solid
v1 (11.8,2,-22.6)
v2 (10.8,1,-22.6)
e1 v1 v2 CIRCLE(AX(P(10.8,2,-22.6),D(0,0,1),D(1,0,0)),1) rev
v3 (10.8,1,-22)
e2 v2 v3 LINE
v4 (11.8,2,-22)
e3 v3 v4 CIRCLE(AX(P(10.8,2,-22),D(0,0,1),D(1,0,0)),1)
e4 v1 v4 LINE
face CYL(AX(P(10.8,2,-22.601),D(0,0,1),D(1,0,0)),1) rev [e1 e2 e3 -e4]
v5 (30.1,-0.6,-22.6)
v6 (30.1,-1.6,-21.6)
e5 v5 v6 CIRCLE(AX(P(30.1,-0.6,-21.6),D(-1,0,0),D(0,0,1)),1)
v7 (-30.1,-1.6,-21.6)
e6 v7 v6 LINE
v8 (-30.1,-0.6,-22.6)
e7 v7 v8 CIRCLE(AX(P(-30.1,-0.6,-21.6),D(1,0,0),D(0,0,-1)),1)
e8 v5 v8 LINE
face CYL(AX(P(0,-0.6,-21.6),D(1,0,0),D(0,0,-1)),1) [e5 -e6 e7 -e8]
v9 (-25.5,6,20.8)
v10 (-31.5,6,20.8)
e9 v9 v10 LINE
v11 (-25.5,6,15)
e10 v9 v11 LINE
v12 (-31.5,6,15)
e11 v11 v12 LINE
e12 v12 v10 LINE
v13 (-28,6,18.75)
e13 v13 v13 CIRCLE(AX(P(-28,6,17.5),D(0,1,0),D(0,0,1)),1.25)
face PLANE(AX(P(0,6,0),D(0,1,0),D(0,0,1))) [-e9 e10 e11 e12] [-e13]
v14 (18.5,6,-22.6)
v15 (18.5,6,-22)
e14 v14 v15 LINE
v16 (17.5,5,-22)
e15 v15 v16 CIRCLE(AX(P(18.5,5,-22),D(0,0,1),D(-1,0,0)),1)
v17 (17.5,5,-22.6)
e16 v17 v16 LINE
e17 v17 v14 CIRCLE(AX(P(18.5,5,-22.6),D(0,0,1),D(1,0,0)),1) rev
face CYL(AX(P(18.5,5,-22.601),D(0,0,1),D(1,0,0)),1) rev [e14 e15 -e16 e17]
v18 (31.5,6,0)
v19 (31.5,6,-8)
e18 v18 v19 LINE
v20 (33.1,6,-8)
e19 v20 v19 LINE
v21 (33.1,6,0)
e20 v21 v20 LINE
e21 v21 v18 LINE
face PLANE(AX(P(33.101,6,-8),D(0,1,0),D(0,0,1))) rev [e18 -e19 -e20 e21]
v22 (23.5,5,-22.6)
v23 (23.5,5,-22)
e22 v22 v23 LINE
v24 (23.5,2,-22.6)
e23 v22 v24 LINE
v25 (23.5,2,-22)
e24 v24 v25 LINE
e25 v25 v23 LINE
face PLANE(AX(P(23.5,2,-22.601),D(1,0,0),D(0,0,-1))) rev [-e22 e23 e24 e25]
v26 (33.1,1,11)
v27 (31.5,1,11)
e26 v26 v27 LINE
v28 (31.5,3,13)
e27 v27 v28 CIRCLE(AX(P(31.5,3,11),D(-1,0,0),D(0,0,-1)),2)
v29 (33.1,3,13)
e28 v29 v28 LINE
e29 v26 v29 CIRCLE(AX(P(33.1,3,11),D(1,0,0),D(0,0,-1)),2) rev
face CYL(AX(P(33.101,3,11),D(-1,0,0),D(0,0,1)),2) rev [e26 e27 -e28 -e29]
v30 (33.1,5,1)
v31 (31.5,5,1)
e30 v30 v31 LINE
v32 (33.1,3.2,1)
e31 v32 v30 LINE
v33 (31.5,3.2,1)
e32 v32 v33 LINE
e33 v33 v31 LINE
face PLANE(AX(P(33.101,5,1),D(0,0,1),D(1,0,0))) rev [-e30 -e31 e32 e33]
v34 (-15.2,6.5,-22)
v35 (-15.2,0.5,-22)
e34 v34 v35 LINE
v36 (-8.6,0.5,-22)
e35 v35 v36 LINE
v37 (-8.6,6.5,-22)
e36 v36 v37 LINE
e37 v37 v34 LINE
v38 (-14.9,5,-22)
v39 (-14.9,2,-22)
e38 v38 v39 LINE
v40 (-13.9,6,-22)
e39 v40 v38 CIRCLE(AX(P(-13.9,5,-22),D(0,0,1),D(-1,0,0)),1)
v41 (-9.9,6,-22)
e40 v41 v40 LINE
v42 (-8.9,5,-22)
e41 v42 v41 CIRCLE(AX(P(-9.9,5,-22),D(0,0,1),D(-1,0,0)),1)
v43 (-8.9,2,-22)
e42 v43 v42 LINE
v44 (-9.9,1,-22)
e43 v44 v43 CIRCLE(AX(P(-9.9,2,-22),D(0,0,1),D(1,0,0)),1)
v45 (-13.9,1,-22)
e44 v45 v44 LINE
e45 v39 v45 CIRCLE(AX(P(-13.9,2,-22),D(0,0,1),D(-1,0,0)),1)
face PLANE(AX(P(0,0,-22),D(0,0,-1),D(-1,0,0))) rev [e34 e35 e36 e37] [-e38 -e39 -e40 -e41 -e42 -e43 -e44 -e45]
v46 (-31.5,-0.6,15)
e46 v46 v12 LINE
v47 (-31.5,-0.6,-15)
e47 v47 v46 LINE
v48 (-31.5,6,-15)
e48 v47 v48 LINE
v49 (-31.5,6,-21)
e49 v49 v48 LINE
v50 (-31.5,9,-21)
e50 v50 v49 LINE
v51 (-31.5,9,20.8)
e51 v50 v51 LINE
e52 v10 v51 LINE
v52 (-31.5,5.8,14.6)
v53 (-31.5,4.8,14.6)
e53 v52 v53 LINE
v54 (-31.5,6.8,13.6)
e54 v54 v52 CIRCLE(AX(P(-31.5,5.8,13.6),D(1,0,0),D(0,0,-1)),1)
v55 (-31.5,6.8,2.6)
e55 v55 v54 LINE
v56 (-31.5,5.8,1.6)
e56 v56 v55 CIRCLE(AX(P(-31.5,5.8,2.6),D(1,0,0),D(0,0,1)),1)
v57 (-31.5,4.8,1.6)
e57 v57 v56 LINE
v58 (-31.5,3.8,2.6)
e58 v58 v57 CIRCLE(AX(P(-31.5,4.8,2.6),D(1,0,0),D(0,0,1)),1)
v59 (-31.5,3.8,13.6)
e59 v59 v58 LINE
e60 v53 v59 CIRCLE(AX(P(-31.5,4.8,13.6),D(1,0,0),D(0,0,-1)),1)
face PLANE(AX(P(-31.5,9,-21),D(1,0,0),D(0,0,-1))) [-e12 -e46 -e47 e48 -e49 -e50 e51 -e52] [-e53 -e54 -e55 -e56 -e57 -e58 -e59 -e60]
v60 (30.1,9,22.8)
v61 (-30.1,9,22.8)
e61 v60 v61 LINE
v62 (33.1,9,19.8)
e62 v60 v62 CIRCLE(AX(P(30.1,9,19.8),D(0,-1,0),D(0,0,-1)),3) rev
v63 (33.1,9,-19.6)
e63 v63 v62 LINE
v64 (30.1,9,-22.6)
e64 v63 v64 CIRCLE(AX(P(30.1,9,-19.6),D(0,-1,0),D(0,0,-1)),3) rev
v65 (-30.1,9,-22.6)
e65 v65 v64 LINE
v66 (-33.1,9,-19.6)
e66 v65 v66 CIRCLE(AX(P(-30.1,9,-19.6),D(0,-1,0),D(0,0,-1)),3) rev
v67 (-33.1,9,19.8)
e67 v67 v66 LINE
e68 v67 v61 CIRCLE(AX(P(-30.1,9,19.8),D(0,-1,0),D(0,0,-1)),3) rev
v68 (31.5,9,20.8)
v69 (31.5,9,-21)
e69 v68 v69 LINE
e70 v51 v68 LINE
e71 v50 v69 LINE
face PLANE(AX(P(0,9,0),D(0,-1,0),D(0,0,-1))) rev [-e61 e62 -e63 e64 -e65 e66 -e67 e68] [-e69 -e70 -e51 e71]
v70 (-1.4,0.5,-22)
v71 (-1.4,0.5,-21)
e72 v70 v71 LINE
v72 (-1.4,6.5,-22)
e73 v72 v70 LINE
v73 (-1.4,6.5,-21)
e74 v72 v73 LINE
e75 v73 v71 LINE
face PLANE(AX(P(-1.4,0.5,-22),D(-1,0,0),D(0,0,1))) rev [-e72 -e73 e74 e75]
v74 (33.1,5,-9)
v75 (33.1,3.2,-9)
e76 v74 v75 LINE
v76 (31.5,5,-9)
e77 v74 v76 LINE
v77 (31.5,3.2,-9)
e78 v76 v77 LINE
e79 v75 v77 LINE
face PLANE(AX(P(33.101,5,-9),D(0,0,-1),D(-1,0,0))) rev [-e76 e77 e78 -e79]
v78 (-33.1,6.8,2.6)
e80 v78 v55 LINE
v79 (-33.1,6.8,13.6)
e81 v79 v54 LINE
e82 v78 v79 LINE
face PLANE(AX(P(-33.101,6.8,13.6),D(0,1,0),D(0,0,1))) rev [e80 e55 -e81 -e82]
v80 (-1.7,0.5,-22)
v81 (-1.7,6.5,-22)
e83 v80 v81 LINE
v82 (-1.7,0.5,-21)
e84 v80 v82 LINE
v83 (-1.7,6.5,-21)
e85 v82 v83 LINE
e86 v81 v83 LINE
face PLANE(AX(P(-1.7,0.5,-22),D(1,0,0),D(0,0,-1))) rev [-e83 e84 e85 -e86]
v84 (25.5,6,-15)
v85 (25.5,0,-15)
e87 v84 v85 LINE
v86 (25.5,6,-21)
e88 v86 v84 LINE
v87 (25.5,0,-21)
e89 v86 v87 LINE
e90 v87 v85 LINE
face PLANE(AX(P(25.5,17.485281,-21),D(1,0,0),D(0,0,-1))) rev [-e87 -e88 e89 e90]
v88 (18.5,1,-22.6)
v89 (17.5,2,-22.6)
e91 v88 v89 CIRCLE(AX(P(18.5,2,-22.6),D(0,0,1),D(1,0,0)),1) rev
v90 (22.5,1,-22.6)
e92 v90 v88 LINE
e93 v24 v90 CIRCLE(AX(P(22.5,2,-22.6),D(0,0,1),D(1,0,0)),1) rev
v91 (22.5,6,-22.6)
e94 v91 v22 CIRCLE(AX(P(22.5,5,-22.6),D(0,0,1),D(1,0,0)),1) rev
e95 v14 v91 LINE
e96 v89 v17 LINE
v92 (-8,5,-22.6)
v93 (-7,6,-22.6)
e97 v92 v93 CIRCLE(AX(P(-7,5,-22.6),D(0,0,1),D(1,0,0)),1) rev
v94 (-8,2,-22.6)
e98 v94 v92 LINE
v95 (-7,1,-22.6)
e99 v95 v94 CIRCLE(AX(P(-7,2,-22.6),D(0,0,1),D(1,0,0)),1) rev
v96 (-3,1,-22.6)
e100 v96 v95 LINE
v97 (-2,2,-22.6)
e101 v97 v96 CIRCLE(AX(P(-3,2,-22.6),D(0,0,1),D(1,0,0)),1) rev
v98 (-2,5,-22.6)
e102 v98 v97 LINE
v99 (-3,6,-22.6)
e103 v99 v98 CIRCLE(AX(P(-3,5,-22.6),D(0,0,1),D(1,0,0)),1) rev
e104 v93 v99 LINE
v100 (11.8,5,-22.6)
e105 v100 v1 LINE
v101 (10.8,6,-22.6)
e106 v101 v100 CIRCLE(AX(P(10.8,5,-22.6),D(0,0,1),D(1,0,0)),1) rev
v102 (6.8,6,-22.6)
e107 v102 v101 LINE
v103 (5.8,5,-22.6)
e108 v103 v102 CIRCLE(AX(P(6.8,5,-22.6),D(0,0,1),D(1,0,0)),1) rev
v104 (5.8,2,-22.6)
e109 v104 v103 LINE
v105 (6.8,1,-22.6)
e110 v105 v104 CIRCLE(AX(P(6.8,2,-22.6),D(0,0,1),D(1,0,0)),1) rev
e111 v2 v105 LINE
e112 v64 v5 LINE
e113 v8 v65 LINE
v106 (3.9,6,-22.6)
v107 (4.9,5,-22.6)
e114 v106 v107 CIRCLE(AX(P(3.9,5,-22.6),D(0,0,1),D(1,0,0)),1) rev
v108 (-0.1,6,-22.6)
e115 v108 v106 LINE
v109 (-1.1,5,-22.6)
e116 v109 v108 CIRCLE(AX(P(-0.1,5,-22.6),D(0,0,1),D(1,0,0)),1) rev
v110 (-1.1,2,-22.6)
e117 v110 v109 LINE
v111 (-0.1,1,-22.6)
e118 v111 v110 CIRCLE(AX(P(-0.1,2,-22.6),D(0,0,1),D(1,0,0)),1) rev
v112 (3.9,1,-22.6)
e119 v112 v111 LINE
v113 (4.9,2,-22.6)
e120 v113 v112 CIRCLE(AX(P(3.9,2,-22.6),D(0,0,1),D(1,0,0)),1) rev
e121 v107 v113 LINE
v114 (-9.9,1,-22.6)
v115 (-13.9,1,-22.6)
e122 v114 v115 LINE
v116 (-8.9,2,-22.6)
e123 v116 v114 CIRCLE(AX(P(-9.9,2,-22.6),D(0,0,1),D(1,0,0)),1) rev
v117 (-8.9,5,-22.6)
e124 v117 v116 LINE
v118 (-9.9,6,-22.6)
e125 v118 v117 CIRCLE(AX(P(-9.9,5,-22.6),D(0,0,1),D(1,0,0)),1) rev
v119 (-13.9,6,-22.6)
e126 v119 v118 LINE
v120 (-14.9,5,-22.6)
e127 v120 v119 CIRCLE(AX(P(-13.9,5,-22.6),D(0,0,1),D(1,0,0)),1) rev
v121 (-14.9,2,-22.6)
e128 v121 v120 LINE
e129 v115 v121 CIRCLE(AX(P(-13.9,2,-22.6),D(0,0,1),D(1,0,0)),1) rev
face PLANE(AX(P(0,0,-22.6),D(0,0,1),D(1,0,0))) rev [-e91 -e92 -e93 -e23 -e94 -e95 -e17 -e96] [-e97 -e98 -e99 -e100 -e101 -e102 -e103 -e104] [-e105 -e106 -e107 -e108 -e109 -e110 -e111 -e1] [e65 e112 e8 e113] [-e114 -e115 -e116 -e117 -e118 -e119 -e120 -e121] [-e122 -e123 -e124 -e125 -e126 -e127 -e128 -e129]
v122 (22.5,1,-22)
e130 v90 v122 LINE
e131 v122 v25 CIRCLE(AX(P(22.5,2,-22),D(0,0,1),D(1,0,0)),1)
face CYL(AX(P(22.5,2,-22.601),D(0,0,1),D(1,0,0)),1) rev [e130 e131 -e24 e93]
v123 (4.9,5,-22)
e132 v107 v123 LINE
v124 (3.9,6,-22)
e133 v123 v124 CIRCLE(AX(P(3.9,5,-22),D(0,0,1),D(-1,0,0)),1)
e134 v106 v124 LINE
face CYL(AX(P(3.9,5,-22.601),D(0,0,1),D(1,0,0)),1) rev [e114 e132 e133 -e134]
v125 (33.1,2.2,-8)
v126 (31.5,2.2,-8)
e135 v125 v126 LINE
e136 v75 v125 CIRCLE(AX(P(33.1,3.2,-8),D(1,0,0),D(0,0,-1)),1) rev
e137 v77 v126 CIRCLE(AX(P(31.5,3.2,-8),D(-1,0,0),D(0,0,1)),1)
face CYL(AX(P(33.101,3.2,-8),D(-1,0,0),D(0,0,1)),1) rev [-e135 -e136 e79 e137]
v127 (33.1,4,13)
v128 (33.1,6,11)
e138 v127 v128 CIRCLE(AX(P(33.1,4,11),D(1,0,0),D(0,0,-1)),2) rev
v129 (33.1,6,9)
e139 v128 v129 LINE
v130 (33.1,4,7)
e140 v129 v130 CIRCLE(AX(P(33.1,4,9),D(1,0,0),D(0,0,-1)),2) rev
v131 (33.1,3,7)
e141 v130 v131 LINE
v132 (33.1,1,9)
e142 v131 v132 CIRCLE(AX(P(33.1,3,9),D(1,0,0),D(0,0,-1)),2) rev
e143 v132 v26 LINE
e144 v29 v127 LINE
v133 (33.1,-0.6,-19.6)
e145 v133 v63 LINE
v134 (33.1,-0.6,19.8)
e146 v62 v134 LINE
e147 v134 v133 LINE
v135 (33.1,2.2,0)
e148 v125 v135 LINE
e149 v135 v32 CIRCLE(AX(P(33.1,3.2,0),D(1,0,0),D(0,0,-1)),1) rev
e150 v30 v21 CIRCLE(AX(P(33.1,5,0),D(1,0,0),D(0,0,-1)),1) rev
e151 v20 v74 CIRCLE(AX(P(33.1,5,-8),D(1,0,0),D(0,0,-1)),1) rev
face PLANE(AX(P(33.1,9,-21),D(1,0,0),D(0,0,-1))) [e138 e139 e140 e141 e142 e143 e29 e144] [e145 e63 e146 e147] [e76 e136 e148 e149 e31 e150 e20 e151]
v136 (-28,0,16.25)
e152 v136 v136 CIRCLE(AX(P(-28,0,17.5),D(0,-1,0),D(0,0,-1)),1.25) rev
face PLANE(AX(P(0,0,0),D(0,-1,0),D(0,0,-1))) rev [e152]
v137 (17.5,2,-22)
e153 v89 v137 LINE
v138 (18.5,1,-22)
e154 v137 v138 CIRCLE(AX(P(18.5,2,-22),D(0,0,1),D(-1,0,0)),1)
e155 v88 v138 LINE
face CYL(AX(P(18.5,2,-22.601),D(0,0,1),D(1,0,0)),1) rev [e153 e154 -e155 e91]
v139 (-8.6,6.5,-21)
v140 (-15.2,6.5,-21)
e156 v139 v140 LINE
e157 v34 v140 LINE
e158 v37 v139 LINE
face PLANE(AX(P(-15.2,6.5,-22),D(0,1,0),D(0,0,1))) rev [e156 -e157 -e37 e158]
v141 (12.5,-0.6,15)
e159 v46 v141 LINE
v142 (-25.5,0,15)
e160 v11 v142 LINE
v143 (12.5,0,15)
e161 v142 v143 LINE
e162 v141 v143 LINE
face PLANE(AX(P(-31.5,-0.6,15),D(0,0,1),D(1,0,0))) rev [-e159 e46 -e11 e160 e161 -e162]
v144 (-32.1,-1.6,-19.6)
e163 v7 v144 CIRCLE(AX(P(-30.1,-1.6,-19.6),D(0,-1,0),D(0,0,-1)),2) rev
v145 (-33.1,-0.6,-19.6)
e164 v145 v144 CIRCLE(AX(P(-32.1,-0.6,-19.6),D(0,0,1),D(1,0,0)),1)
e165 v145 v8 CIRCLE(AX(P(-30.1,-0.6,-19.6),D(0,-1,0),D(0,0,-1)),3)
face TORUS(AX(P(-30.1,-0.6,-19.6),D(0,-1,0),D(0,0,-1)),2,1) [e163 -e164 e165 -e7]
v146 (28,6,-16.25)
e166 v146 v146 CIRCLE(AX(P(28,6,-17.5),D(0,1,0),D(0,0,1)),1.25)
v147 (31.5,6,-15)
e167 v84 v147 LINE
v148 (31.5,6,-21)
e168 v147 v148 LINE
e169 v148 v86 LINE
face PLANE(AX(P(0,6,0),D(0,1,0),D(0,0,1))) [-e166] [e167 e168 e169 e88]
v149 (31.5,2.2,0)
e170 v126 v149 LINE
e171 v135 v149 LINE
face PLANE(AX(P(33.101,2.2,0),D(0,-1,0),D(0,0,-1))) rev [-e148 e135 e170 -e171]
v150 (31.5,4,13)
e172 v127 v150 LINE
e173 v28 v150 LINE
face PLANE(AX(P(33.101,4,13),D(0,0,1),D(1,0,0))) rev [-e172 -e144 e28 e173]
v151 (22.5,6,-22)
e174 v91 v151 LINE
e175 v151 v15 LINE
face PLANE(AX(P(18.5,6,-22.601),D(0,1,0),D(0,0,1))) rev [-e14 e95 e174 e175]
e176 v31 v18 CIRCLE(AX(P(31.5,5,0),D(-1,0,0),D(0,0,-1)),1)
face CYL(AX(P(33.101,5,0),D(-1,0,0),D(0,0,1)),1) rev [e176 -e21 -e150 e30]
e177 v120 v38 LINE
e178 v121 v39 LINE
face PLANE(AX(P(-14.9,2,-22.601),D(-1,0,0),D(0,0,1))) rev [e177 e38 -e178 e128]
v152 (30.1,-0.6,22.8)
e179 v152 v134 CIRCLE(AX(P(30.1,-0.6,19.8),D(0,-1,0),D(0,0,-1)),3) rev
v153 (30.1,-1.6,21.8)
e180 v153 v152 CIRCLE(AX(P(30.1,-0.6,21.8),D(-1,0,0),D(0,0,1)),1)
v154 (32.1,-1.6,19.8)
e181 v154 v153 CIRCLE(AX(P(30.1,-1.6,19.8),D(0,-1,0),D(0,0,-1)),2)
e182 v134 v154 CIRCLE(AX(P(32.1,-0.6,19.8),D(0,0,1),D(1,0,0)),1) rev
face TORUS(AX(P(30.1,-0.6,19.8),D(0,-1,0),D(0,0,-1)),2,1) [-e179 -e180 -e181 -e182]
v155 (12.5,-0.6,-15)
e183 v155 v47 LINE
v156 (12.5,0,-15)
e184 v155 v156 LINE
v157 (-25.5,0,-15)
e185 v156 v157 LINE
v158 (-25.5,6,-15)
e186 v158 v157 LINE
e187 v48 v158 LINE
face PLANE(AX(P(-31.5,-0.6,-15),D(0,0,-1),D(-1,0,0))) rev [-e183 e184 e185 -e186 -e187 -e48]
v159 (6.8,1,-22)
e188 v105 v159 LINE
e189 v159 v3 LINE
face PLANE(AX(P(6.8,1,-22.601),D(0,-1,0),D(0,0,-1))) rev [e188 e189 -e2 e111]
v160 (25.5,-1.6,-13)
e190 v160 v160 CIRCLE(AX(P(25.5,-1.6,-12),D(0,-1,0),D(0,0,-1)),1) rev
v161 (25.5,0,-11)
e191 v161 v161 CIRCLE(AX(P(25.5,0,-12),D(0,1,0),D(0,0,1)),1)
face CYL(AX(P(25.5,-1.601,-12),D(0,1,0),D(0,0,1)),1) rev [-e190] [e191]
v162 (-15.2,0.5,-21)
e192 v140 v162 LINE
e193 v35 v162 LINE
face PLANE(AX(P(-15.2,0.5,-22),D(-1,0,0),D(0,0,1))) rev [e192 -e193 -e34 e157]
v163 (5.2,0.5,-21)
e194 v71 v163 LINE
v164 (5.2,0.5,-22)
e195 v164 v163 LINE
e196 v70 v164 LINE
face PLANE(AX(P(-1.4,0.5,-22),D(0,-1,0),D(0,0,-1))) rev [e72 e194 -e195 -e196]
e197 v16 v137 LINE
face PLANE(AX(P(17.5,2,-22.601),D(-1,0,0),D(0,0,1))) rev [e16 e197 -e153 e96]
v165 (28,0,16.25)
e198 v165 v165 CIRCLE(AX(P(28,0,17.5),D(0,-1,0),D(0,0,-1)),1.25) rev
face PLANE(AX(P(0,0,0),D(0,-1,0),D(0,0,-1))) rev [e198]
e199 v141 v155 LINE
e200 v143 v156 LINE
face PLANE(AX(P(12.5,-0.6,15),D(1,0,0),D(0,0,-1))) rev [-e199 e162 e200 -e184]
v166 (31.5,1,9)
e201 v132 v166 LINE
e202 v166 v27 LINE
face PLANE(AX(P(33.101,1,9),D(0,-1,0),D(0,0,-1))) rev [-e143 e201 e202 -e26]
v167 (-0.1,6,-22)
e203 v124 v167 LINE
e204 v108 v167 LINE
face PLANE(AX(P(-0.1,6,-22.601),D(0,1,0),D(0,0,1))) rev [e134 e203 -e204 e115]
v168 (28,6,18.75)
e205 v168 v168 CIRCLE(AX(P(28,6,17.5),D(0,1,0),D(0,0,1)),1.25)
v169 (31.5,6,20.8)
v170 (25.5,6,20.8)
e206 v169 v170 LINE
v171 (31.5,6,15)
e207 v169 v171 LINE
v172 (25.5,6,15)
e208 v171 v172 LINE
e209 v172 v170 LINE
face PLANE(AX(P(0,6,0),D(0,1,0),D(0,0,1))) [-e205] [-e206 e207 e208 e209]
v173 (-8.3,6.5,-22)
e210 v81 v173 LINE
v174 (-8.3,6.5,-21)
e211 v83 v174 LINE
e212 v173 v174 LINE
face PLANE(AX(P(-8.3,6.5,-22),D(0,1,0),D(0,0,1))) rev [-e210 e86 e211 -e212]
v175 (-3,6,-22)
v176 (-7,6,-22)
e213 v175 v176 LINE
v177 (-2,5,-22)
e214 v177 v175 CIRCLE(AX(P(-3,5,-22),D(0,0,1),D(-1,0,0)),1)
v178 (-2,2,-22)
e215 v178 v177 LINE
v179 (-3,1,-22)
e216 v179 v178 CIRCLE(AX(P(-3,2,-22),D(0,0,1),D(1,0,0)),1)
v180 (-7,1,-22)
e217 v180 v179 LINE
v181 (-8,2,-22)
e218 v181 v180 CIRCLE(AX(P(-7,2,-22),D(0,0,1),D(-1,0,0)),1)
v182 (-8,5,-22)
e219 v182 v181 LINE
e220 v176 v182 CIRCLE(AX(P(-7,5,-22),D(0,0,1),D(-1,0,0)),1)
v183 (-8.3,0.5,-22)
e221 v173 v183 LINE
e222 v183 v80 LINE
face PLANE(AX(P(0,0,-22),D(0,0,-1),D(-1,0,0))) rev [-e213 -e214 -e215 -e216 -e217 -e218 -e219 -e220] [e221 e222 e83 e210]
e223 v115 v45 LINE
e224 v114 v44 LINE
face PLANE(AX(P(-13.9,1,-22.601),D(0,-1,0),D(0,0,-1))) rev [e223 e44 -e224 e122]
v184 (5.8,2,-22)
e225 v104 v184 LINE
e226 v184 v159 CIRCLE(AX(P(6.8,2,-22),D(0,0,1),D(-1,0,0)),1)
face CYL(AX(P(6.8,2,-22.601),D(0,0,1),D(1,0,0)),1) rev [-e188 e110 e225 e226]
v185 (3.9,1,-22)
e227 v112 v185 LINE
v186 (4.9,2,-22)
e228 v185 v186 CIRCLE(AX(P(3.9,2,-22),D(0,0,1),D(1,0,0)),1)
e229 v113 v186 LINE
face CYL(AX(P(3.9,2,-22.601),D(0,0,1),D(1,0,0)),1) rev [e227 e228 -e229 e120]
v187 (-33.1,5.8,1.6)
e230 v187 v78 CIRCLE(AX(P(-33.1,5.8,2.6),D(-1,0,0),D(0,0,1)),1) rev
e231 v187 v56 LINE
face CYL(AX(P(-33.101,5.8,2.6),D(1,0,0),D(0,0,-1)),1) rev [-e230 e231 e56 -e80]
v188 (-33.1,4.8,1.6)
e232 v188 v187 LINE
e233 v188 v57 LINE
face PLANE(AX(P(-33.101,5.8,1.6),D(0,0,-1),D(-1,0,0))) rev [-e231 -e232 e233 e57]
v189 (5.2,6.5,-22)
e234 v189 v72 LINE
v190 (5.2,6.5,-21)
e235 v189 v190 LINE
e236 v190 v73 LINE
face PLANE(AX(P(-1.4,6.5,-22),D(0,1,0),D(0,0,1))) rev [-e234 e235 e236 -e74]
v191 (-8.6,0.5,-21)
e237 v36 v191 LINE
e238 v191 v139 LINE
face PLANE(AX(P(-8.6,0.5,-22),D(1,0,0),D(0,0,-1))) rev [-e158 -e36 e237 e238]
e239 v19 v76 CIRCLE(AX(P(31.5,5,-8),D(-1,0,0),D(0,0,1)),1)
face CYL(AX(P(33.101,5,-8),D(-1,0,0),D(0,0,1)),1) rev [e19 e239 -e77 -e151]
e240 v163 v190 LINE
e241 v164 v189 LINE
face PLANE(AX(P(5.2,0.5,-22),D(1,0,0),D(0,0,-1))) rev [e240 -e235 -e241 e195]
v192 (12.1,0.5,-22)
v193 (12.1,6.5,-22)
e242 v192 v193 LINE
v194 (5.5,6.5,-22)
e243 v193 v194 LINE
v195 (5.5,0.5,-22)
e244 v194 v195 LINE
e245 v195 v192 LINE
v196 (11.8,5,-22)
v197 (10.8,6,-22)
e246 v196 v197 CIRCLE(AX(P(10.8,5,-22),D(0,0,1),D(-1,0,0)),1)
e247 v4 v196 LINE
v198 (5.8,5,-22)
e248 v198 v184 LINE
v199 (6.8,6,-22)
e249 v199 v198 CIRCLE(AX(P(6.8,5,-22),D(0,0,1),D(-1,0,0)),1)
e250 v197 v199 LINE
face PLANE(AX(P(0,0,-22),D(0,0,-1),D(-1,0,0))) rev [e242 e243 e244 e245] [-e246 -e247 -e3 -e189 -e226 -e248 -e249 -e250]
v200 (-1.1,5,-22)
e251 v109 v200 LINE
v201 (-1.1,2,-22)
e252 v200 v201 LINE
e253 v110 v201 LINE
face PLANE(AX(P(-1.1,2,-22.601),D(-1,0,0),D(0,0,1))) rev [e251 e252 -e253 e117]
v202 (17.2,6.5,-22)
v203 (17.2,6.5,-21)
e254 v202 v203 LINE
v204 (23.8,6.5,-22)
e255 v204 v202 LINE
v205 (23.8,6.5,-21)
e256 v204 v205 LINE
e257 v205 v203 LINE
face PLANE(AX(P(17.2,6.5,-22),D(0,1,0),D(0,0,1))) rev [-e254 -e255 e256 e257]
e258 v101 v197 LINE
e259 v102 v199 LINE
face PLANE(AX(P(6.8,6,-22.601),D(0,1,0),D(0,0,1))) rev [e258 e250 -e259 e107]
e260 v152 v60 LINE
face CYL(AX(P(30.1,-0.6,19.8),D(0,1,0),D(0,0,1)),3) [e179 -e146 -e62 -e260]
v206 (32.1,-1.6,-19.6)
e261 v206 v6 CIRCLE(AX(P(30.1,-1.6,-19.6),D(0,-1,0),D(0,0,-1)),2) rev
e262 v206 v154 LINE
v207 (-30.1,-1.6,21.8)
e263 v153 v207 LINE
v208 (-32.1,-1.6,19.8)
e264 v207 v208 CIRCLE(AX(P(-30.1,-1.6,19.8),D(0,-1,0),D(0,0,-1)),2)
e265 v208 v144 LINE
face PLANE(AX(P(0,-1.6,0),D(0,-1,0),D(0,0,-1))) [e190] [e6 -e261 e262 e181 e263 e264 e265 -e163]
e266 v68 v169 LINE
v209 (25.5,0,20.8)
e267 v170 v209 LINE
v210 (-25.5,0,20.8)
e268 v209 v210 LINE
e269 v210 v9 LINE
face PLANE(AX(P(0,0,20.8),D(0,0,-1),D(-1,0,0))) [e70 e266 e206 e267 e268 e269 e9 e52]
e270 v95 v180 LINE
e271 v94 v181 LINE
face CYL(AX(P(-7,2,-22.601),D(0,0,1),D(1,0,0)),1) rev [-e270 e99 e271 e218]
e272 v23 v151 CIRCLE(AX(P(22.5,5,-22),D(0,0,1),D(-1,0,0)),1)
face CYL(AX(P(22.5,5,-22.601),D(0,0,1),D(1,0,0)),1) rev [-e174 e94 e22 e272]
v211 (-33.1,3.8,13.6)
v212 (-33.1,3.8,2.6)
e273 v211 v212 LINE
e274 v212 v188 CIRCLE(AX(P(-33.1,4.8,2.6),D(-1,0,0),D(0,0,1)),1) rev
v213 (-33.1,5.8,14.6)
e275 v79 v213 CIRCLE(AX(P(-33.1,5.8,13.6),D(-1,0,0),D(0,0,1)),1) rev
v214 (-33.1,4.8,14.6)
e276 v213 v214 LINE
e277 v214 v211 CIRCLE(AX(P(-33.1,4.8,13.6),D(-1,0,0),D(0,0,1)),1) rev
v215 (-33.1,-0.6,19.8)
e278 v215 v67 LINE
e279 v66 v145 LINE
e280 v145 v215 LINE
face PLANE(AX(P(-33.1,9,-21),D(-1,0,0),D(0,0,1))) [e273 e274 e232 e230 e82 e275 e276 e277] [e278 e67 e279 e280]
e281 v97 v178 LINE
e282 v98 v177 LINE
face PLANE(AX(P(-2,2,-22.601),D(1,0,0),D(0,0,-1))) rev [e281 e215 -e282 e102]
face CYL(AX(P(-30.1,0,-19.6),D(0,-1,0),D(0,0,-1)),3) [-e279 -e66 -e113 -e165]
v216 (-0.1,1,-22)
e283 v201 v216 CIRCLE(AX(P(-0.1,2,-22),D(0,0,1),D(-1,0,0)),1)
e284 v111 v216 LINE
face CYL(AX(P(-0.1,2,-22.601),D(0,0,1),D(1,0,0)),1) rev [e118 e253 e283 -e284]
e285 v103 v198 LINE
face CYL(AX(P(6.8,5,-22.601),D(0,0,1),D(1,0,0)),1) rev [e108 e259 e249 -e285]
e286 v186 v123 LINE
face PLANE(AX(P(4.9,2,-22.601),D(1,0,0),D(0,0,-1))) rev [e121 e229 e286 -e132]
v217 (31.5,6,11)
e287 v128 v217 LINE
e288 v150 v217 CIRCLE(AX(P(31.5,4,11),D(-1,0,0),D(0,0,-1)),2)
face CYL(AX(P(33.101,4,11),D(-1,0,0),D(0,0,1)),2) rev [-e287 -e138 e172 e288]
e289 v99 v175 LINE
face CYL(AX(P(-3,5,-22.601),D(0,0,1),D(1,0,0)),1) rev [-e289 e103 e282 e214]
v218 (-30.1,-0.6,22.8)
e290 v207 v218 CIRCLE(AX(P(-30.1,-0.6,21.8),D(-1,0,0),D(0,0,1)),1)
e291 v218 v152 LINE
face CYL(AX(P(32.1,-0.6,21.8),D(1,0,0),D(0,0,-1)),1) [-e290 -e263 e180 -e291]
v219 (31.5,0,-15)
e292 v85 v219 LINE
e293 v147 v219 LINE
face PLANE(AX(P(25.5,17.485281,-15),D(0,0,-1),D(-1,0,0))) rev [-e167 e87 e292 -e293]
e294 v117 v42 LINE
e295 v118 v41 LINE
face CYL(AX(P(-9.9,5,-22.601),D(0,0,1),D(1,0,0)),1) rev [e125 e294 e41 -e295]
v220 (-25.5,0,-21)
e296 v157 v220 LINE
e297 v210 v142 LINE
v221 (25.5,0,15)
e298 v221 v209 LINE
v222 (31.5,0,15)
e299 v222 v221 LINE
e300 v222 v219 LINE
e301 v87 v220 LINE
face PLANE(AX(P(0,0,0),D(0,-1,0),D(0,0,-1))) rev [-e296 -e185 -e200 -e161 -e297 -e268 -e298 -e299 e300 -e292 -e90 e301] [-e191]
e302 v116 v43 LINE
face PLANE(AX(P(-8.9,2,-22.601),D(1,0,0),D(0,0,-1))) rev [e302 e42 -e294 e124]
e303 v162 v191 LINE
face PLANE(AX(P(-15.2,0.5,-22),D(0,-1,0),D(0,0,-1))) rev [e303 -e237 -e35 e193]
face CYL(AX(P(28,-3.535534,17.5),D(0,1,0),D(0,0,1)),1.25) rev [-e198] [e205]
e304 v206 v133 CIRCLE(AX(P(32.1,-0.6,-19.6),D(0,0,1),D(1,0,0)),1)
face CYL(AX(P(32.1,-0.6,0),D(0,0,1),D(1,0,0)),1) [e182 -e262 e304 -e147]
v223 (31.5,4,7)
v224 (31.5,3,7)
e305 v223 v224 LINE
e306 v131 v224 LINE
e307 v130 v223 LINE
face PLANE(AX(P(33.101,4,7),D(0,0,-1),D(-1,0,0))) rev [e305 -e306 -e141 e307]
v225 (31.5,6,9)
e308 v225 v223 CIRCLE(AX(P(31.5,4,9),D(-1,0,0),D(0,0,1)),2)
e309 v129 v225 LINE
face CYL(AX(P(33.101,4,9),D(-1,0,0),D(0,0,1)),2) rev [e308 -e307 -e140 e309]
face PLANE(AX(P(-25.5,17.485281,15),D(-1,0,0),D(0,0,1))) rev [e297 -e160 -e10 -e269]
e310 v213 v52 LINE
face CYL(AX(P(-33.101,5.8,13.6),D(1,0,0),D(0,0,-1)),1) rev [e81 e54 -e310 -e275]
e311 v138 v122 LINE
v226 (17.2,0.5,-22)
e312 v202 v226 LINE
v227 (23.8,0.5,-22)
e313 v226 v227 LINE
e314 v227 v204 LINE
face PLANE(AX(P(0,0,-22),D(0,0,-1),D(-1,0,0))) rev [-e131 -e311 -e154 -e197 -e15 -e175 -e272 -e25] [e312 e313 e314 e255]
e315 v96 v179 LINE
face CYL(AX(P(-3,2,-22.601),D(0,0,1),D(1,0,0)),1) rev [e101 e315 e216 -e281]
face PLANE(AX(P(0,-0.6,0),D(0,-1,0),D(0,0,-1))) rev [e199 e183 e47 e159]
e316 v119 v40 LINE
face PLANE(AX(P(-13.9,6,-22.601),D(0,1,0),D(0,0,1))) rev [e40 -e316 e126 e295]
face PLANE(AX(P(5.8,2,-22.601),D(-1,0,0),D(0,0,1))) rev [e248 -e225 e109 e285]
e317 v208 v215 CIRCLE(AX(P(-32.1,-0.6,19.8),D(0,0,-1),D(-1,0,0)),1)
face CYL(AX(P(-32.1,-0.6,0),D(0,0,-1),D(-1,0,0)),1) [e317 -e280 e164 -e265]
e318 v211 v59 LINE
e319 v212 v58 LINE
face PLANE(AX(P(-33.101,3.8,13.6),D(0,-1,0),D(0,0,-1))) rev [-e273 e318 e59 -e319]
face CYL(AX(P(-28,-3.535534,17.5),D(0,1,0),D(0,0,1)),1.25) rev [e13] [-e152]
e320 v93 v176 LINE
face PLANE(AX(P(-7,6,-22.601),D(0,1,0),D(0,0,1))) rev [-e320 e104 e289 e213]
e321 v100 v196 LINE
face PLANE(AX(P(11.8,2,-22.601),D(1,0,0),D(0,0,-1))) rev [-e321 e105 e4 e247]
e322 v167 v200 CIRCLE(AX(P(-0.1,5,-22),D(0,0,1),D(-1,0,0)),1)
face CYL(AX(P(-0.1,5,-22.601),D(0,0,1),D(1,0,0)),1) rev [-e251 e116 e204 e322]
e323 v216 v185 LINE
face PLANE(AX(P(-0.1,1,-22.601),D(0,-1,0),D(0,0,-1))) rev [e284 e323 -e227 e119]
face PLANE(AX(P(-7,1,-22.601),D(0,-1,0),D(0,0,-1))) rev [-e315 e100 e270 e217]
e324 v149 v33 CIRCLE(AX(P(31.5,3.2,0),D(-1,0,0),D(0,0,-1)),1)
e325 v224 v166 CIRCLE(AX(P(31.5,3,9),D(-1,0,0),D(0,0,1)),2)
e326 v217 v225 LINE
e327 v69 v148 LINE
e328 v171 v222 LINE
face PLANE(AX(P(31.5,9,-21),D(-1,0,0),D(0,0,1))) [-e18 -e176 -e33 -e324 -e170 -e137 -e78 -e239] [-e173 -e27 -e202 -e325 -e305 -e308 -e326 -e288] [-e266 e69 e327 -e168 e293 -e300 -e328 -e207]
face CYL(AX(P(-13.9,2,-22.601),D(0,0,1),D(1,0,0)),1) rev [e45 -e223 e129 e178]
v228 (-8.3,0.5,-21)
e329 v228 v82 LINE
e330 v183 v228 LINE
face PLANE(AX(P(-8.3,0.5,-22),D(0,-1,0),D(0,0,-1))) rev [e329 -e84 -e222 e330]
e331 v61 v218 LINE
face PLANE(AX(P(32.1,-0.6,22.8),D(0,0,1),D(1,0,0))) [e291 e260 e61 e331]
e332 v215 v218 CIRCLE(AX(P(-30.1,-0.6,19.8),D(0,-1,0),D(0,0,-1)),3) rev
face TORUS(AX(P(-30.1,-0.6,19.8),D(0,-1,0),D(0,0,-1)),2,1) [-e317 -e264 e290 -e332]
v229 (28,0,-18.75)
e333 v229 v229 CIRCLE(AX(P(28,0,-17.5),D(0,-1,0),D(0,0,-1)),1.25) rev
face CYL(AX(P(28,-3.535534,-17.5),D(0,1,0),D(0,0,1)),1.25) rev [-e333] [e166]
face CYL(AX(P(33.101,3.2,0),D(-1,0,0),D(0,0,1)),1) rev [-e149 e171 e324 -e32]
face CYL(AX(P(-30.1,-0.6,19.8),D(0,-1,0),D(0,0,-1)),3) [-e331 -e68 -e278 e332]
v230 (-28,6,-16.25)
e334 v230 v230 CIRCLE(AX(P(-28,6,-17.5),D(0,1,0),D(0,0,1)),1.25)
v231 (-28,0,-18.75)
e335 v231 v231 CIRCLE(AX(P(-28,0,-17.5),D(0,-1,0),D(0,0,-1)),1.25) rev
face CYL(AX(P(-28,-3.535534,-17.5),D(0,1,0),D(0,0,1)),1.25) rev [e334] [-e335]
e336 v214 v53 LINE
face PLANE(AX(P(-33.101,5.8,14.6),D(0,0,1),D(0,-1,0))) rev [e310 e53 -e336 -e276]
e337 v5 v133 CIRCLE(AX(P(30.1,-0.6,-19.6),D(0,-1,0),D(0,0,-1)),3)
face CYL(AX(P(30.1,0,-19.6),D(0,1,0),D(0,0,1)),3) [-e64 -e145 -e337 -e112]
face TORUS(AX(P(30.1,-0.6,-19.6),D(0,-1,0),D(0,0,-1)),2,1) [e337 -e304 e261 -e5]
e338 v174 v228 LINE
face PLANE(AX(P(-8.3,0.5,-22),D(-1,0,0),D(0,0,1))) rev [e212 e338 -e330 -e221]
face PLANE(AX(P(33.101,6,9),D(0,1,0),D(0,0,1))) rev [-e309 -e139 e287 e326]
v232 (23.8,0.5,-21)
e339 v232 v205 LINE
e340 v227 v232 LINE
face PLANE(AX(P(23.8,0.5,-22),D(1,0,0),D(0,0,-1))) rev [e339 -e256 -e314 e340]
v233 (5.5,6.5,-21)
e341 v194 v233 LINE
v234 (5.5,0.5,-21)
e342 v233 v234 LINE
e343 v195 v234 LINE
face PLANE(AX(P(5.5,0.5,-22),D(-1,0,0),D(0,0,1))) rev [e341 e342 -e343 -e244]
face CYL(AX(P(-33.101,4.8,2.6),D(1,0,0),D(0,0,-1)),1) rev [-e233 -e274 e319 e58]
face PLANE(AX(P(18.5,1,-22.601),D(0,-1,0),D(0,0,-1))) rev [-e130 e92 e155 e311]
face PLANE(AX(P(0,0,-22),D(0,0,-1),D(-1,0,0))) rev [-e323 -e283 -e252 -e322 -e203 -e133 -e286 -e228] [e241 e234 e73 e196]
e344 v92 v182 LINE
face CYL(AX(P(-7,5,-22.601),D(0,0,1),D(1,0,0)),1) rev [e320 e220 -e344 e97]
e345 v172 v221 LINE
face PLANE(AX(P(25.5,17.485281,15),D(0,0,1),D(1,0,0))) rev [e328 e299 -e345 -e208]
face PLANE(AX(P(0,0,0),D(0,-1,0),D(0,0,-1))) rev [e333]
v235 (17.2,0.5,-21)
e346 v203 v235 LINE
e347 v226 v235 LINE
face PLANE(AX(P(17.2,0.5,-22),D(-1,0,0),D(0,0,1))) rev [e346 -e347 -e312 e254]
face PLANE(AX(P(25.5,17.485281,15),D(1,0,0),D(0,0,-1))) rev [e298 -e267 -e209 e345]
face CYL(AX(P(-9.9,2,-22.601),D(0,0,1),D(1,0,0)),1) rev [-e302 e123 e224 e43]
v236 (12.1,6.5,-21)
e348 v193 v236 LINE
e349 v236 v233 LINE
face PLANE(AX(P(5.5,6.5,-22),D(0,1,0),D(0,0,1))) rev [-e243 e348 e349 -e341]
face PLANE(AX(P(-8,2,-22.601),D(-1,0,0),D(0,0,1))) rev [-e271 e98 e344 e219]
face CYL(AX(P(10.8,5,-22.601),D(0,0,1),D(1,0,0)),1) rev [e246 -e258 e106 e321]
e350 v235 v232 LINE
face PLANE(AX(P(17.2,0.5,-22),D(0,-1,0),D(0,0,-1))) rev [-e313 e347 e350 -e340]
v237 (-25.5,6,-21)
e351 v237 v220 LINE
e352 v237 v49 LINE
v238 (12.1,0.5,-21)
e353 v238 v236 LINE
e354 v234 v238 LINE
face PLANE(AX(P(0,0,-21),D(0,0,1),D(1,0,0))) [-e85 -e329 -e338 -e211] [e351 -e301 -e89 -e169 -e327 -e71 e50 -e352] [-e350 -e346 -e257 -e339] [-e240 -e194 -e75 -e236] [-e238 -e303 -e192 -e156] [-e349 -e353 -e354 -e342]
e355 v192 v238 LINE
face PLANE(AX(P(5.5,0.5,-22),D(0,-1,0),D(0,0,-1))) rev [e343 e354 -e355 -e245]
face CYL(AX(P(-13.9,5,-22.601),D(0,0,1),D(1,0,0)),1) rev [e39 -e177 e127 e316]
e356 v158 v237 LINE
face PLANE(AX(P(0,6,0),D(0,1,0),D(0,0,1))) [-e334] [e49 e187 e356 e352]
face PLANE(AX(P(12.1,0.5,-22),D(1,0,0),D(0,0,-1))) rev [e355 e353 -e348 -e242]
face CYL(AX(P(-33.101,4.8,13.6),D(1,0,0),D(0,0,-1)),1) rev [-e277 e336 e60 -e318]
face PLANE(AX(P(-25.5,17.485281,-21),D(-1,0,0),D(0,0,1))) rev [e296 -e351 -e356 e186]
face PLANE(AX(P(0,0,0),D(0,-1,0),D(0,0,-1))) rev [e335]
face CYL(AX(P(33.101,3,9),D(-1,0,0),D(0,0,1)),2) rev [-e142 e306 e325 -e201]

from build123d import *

# Parameters (mm, degrees)
SKETCH_1_W             = 63
SKETCH_1_H             = 42
EXTRUDE_298_DEPTH      = 1.6
SKETCH_2_W             = 44
SKETCH_2_H             = 30
CUT_EXTRUDE_685_DEPTH  = 0.6
SKETCH_4_W             = 1.6
SKETCH_4_H             = 42
EXTRUDE_929_DEPTH      = 10.6
SKETCH_5_W             = 6
SKETCH_5_H             = 6
EXTRUDE_1327_DEPTH     = 6
SKETCH_6_R             = 1.25
CUT_EXTRUDE_1660_DEPTH = 9
SKETCH_9_W             = 66.2
SKETCH_9_H             = 10.6
EXTRUDE_4_DEPTH        = 1.6
SKETCH_10_W            = 6.6
SKETCH_10_H            = 6
CUT_EXTRUDE_2783_DEPTH = 1
CUT_EXTRUDE_3291_REACH = 57.006
FILLET_4_R             = 1
FILLET_5_R             = 3
TF_REACH               = 71.028
USB_REACH              = 71.028
EXTRUDE_START          = 1.8
EXTRUDE_5781_DEPTH     = 1.8
FILLET_7_R             = 3
FILLET_8_R             = 1
EXTRUDE_5_DEPTH        = 0.2
BOOT_REACH             = 43.188
SKETCH_25_R            = 1


with BuildPart() as part:
    # 草图1 → Extrude 298 (new body)
    with BuildSketch(Plane(origin=(0, 0, 0), x_dir=(1, 0, 0), z_dir=(0, 1, 0))):
        Rectangle(SKETCH_1_W, SKETCH_1_H)
    extrude(amount=-EXTRUDE_298_DEPTH)

    # 草图2 → Cut-Extrude 685 (cut)
    with BuildSketch(Plane(origin=(0, 0, 0), x_dir=(1, 0, 0), z_dir=(0, 1, 0))):
        with Locations((-9.5, 0)):
            Rectangle(SKETCH_2_W, SKETCH_2_H)
    extrude(amount=-CUT_EXTRUDE_685_DEPTH, mode=Mode.SUBTRACT)

    # 草图4 → Extrude 929 (add)
    with BuildSketch(Plane(origin=(0, -1.6, 0), x_dir=(-1, 0, 0), z_dir=(0, -1, 0))):
        with Locations((-32.3, 0)):
            Rectangle(SKETCH_4_W, SKETCH_4_H)
        with Locations((32.3, 0)):
            Rectangle(SKETCH_4_W, SKETCH_4_H)
    extrude(amount=-EXTRUDE_929_DEPTH)

    # 草图5 → Extrude 1327 (add)
    with BuildSketch(Plane(origin=(0, 0, 0), x_dir=(1, 0, 0), z_dir=(0, 1, 0))):
        with Locations((-28.5, 18)):
            Rectangle(SKETCH_5_W, SKETCH_5_H)
        with Locations((28.5, 18)):
            Rectangle(SKETCH_5_W, SKETCH_5_H)
        with Locations((-28.5, -18)):
            Rectangle(SKETCH_5_W, SKETCH_5_H)
        with Locations((28.5, -18)):
            Rectangle(SKETCH_5_W, SKETCH_5_H)
    extrude(amount=EXTRUDE_1327_DEPTH)

    # 草图6 → Cut-Extrude 1660 (cut)
    with BuildSketch(Plane(origin=(0, 9, 0), x_dir=(1, 0, 0), z_dir=(0, 1, 0))):
        with Locations(Location((-28, 17.5, 0), (0, 0, 270))):
            Circle(SKETCH_6_R)
        with Locations(Location((28, 17.5, 0), (0, 0, 270))):
            Circle(SKETCH_6_R)
        with Locations(Location((28, -17.5, 0), (0, 0, 270))):
            Circle(SKETCH_6_R)
        with Locations(Location((-28, -17.5, 0), (0, 0, 270))):
            Circle(SKETCH_6_R)
    extrude(amount=-CUT_EXTRUDE_1660_DEPTH, mode=Mode.SUBTRACT)

    # 草图9 → 凸台-拉伸4 (add)
    with BuildSketch(Plane(origin=(0, 0, -21), x_dir=(-1, 0, 0), z_dir=(0, 0, -1))):
        with Locations((0, 3.7)):
            Rectangle(SKETCH_9_W, SKETCH_9_H)
    extrude(amount=EXTRUDE_4_DEPTH)

    # 草图10 → Cut-Extrude 2783 (cut)
    with BuildSketch(Plane.XY.offset(-21)):
        with Locations((20.5, 3.5)):
            Rectangle(SKETCH_10_W, SKETCH_10_H)
        with Locations((8.8, 3.5)):
            Rectangle(SKETCH_10_W, SKETCH_10_H)
        with Locations((1.9, 3.5)):
            Rectangle(SKETCH_10_W, SKETCH_10_H)
        with Locations((-5, 3.5)):
            Rectangle(SKETCH_10_W, SKETCH_10_H)
        with Locations((-11.9, 3.5)):
            Rectangle(SKETCH_10_W, SKETCH_10_H)
    extrude(amount=-CUT_EXTRUDE_2783_DEPTH, mode=Mode.SUBTRACT)

    # 草图12 → Cut-Extrude 3291 (cut, up to next)
    with BuildSketch(Plane.XY.offset(-22), mode=Mode.PRIVATE) as cut_extrude_3291_sk1:
        with BuildLine():
            Line((5.8, 2), (5.8, 5))
            ThreePointArc((5.8, 5), (6.092893219, 5.707106781), (6.8, 6))
            Line((6.8, 6), (10.8, 6))
            ThreePointArc((10.8, 6), (11.507106781, 5.707106781), (11.8, 5))
            Line((11.8, 5), (11.8, 2))
            ThreePointArc((11.8, 2), (11.507106781, 1.292893219), (10.8, 1))
            Line((10.8, 1), (6.8, 1))
            ThreePointArc((6.8, 1), (6.092893219, 1.292893219), (5.8, 2))
        make_face()
    cut_extrude_3291_tool1 = extrude(cut_extrude_3291_sk1.sketch, amount=-CUT_EXTRUDE_3291_REACH, mode=Mode.PRIVATE) & part.part
    # 草图12 → Cut-Extrude 3291 (cut, up to next)
    with BuildSketch(Plane.XY.offset(-22), mode=Mode.PRIVATE) as cut_extrude_3291_sk2:
        with BuildLine():
            Line((18.5, 1), (22.5, 1))
            ThreePointArc((22.5, 1), (23.207106781, 1.292893219), (23.5, 2))
            Line((23.5, 2), (23.5, 5))
            ThreePointArc((23.5, 5), (23.207106781, 5.707106781), (22.5, 6))
            Line((22.5, 6), (18.5, 6))
            ThreePointArc((18.5, 6), (17.792893219, 5.707106781), (17.5, 5))
            Line((17.5, 5), (17.5, 2))
            ThreePointArc((17.5, 2), (17.792893219, 1.292893219), (18.5, 1))
        make_face()
    cut_extrude_3291_tool2 = extrude(cut_extrude_3291_sk2.sketch, amount=-CUT_EXTRUDE_3291_REACH, mode=Mode.PRIVATE) & part.part
    # 草图12 → Cut-Extrude 3291 (cut, up to next)
    with BuildSketch(Plane.XY.offset(-22), mode=Mode.PRIVATE) as cut_extrude_3291_sk3:
        with BuildLine():
            Line((-1.1, 2), (-1.1, 5))
            ThreePointArc((-1.1, 5), (-0.807106781, 5.707106781), (-0.1, 6))
            Line((-0.1, 6), (3.9, 6))
            ThreePointArc((3.9, 6), (4.607106781, 5.707106781), (4.9, 5))
            Line((4.9, 5), (4.9, 2))
            ThreePointArc((4.9, 2), (4.607106781, 1.292893219), (3.9, 1))
            Line((3.9, 1), (-0.1, 1))
            ThreePointArc((-0.1, 1), (-0.807106781, 1.292893219), (-1.1, 2))
        make_face()
    cut_extrude_3291_tool3 = extrude(cut_extrude_3291_sk3.sketch, amount=-CUT_EXTRUDE_3291_REACH, mode=Mode.PRIVATE) & part.part
    # 草图12 → Cut-Extrude 3291 (cut, up to next)
    with BuildSketch(Plane.XY.offset(-22), mode=Mode.PRIVATE) as cut_extrude_3291_sk4:
        with BuildLine():
            Line((-8, 2), (-8, 5))
            ThreePointArc((-8, 5), (-7.707106781, 5.707106781), (-7, 6))
            Line((-7, 6), (-3, 6))
            ThreePointArc((-3, 6), (-2.292893219, 5.707106781), (-2, 5))
            Line((-2, 5), (-2, 2))
            ThreePointArc((-2, 2), (-2.292893219, 1.292893219), (-3, 1))
            Line((-3, 1), (-7, 1))
            ThreePointArc((-7, 1), (-7.707106781, 1.292893219), (-8, 2))
        make_face()
    cut_extrude_3291_tool4 = extrude(cut_extrude_3291_sk4.sketch, amount=-CUT_EXTRUDE_3291_REACH, mode=Mode.PRIVATE) & part.part
    # 草图12 → Cut-Extrude 3291 (cut, up to next)
    with BuildSketch(Plane.XY.offset(-22), mode=Mode.PRIVATE) as cut_extrude_3291_sk5:
        with BuildLine():
            Line((-14.9, 2), (-14.9, 5))
            ThreePointArc((-14.9, 5), (-14.607106781, 5.707106781), (-13.9, 6))
            Line((-13.9, 6), (-9.9, 6))
            ThreePointArc((-9.9, 6), (-9.192893219, 5.707106781), (-8.9, 5))
            Line((-8.9, 5), (-8.9, 2))
            ThreePointArc((-8.9, 2), (-9.192893219, 1.292893219), (-9.9, 1))
            Line((-9.9, 1), (-13.9, 1))
            ThreePointArc((-13.9, 1), (-14.607106781, 1.292893219), (-14.9, 2))
        make_face()
    cut_extrude_3291_tool5 = extrude(cut_extrude_3291_sk5.sketch, amount=-CUT_EXTRUDE_3291_REACH, mode=Mode.PRIVATE) & part.part
    add(cut_extrude_3291_tool1.solids().sort_by_distance((8.8, 3.5, -22))[0], mode=Mode.SUBTRACT)
    add(cut_extrude_3291_tool2.solids().sort_by_distance((20.5, 3.5, -22))[0], mode=Mode.SUBTRACT)
    add(cut_extrude_3291_tool3.solids().sort_by_distance((1.9, 3.5, -22))[0], mode=Mode.SUBTRACT)
    add(cut_extrude_3291_tool4.solids().sort_by_distance((-5, 3.5, -22))[0], mode=Mode.SUBTRACT)
    add(cut_extrude_3291_tool5.solids().sort_by_distance((-11.9, 3.5, -22))[0], mode=Mode.SUBTRACT)

    # 圆角4
    fillet_4_edges = [part.edges().sort_by_distance(p)[0] for p in [
        (0, -1.6, -22.6),
        (33.1, -1.6, -0.8),
        (-33.1, -1.6, -0.8),
    ]]
    fillet(fillet_4_edges, radius=FILLET_4_R)

    # 圆角5
    # the kernel refuses this fillet: 3 mm, written as the material it takes off along each edge
    with BuildSketch(Plane(origin=(30.1, -1.6, -19.6), x_dir=(0, 0, -1), z_dir=(-1, 0, 0))) as fillet_5_piece_1:
        with BuildLine():
            CenterArc((2, -1), 1, 0, 90)
            Line((3, -1), (3, 0))
            Line((3, 0), (2, 0))
        make_face()
    revolve(axis=Axis((30.1, -1.6, -19.6), (0, -1, 0)), revolution_arc=90, mode=Mode.SUBTRACT)
    with BuildSketch(Plane(origin=(-30.1, -1.6, -19.6), x_dir=(-1, 0, 0), z_dir=(0, 0, 1))) as fillet_5_piece_2:
        with BuildLine():
            CenterArc((2, -1), 1, 0, 90)
            Line((3, -1), (3, 0))
            Line((3, 0), (2, 0))
        make_face()
    revolve(axis=Axis((-30.1, -1.6, -19.6), (0, -1, 0)), revolution_arc=90, mode=Mode.SUBTRACT)
    with BuildSketch(Plane(origin=(33.1, 16.5, -22.6), x_dir=(0, 0, 1), z_dir=(0, -1, 0)), Plane(origin=(-33.1, -1.6, -22.6), x_dir=(0, 0, 1), z_dir=(0, 1, 0))) as fillet_5_piece_3:
        with BuildLine():
            CenterArc((FILLET_5_R, FILLET_5_R), FILLET_5_R, 180, 90)
            Line((0, FILLET_5_R), (0, 0))
            Line((0, 0), (FILLET_5_R, 0))
        make_face()
    extrude(amount=18.1, mode=Mode.SUBTRACT)

    # 草图16 → tf (cut, up to next)
    with BuildSketch(Plane(origin=(-31.5, 0, 0), x_dir=(0, 0, -1), z_dir=(1, 0, 0)), mode=Mode.PRIVATE) as tf_sk1:
        with BuildLine():
            Line((-14.6, 5.8), (-14.6, 4.8))
            ThreePointArc((-14.6, 4.8), (-14.307106781, 4.092893219), (-13.6, 3.8))
            Line((-13.6, 3.8), (-2.6, 3.8))
            ThreePointArc((-2.6, 3.8), (-1.892893219, 4.092893219), (-1.6, 4.8))
            Line((-1.6, 4.8), (-1.6, 5.8))
            ThreePointArc((-1.6, 5.8), (-1.892893219, 6.507106781), (-2.6, 6.8))
            Line((-2.6, 6.8), (-13.6, 6.8))
            ThreePointArc((-13.6, 6.8), (-14.307106781, 6.507106781), (-14.6, 5.8))
        make_face()
    tf_tool1 = extrude(tf_sk1.sketch, amount=-TF_REACH, mode=Mode.PRIVATE) & part.part
    add(tf_tool1.solids().sort_by_distance((-31.5, 5.3, 8.1))[0], mode=Mode.SUBTRACT)

    # 草图17 → usb (cut, up to next)
    with BuildSketch(Plane.ZY.offset(-31.5), mode=Mode.PRIVATE) as usb_sk1:
        with BuildLine():
            Line((7, 4), (7, 3))
            ThreePointArc((7, 3), (7.585786438, 1.585786438), (9, 1))
            Line((9, 1), (11, 1))
            ThreePointArc((11, 1), (12.414213562, 1.585786438), (13, 3))
            Line((13, 3), (13, 4))
            ThreePointArc((13, 4), (12.414213562, 5.414213562), (11, 6))
            Line((11, 6), (9, 6))
            ThreePointArc((9, 6), (7.585786438, 5.414213562), (7, 4))
        make_face()
    usb_tool1 = extrude(usb_sk1.sketch, amount=-USB_REACH, mode=Mode.PRIVATE) & part.part
    # 草图17 → usb (cut, up to next)
    with BuildSketch(Plane.ZY.offset(-31.5), mode=Mode.PRIVATE) as usb_sk2:
        with BuildLine():
            Line((1, 5), (1, 3.2))
            ThreePointArc((1, 3.2), (0.707106781, 2.492893219), (0, 2.2))
            Line((0, 2.2), (-8, 2.2))
            ThreePointArc((-8, 2.2), (-8.707106781, 2.492893219), (-9, 3.2))
            Line((-9, 3.2), (-9, 5))
            ThreePointArc((-9, 5), (-8.707106781, 5.707106781), (-8, 6))
            Line((-8, 6), (0, 6))
            ThreePointArc((0, 6), (0.707106781, 5.707106781), (1, 5))
        make_face()
    usb_tool2 = extrude(usb_sk2.sketch, amount=-USB_REACH, mode=Mode.PRIVATE) & part.part
    add(usb_tool1.solids().sort_by_distance((31.5, 3.5, 10))[0], mode=Mode.SUBTRACT)
    add(usb_tool2.solids().sort_by_distance((31.5, 4.1, -4))[0], mode=Mode.SUBTRACT)

    # 草图18 → Extrude 5781 (add)
    with BuildSketch(Plane.XY.offset(21).offset(EXTRUDE_START)):
        with BuildLine():
            Line((33.1, 9), (33.1, -0.6))
            ThreePointArc((33.1, -0.6), (32.807106781, -1.307106781), (32.1, -1.6))
            Line((32.1, -1.6), (-32.1, -1.6))
            ThreePointArc((-32.1, -1.6), (-32.807106781, -1.307106781), (-33.1, -0.6))
            Line((-33.1, -0.6), (-33.1, 9))
            Line((-33.1, 9), (33.1, 9))
        make_face()
    extrude(amount=-EXTRUDE_5781_DEPTH)

    # 圆角7
    # the kernel refuses this fillet: 3 mm, written as the material it takes off along each edge
    with BuildSketch(Plane(origin=(33.1, 16.5, 22.8), x_dir=(0, 0, -1), z_dir=(0, -1, 0)), Plane(origin=(-33.1, -8.1, 22.8), x_dir=(0, 0, -1), z_dir=(0, 1, 0))) as fillet_7_piece_1:
        with BuildLine():
            CenterArc((FILLET_7_R, -FILLET_7_R), FILLET_7_R, 90, 90)
            Line((0, -FILLET_7_R), (0, 0))
            Line((0, 0), (FILLET_7_R, 0))
        make_face()
    extrude(amount=24.6, mode=Mode.SUBTRACT)

    # 圆角8
    # the kernel refuses this fillet: 1 mm, written as the material it takes off along each edge
    with BuildSketch(Plane(origin=(-30.1, -1.6, 19.8), x_dir=(0, 0, 1), z_dir=(1, 0, 0))) as fillet_8_piece_1:
        with BuildLine():
            CenterArc((3 - FILLET_8_R, -FILLET_8_R), FILLET_8_R, 0, 90)
            Line((3 - FILLET_8_R, 0), (3, 0))
            Line((3, 0), (3, -FILLET_8_R))
        make_face()
    revolve(axis=Axis((-30.1, -1.6, 19.8), (0, -1, 0)), revolution_arc=89.560936277, mode=Mode.SUBTRACT)
    with BuildSketch(Plane(origin=(30.1, -1.6, 19.8), x_dir=(0, 0, 1), z_dir=(-1, 0, 0))) as fillet_8_piece_2:
        with BuildLine():
            CenterArc((3 - FILLET_8_R, FILLET_8_R), FILLET_8_R, 270, 90)
            Line((3 - FILLET_8_R, 0), (3, 0))
            Line((3, 0), (3, FILLET_8_R))
        make_face()
    revolve(axis=Axis((30.1, -1.6, 19.8), (0, 1, 0)), revolution_arc=89.560936277, mode=Mode.SUBTRACT)
    with BuildSketch(Plane(origin=(30.1, -1.6, 22.8), x_dir=(0, 1, 0), z_dir=(-1, 0, 0))) as fillet_8_piece_3:
        with BuildLine():
            CenterArc((FILLET_8_R, FILLET_8_R), FILLET_8_R, 180, 90)
            Line((0, FILLET_8_R), (0, 0))
            Line((0, 0), (FILLET_8_R, 0))
        make_face()
    extrude(amount=60.2, mode=Mode.SUBTRACT)

    # 草图19 → 凸台-拉伸5 (add)
    with BuildSketch(Plane(origin=(0, 0, 21), x_dir=(-1, 0, 0), z_dir=(0, 0, -1))):
        Polygon((31.5, 9), (-31.5, 9), (-31.5, 6), (-25.5, 6), (-25.5, 0), (25.5, 0), (25.5, 6), (31.5, 6), align=None)
    extrude(amount=EXTRUDE_5_DEPTH)

    # 草图25 → BOOT孔 (cut, up to next)
    with BuildSketch(Plane(origin=(0, 0, 0), x_dir=(1, 0, 0), z_dir=(0, 1, 0)), mode=Mode.PRIVATE) as boot_sk1:
        with Locations(Location((25.5, 12, 0), (0, 0, 270))):
            Circle(SKETCH_25_R)
    boot_tool1 = extrude(boot_sk1.sketch, amount=-BOOT_REACH, mode=Mode.PRIVATE) & part.part
    add(boot_tool1.solids().sort_by_distance((25.5, 0, -12))[0], mode=Mode.SUBTRACT)


solid = part.part
